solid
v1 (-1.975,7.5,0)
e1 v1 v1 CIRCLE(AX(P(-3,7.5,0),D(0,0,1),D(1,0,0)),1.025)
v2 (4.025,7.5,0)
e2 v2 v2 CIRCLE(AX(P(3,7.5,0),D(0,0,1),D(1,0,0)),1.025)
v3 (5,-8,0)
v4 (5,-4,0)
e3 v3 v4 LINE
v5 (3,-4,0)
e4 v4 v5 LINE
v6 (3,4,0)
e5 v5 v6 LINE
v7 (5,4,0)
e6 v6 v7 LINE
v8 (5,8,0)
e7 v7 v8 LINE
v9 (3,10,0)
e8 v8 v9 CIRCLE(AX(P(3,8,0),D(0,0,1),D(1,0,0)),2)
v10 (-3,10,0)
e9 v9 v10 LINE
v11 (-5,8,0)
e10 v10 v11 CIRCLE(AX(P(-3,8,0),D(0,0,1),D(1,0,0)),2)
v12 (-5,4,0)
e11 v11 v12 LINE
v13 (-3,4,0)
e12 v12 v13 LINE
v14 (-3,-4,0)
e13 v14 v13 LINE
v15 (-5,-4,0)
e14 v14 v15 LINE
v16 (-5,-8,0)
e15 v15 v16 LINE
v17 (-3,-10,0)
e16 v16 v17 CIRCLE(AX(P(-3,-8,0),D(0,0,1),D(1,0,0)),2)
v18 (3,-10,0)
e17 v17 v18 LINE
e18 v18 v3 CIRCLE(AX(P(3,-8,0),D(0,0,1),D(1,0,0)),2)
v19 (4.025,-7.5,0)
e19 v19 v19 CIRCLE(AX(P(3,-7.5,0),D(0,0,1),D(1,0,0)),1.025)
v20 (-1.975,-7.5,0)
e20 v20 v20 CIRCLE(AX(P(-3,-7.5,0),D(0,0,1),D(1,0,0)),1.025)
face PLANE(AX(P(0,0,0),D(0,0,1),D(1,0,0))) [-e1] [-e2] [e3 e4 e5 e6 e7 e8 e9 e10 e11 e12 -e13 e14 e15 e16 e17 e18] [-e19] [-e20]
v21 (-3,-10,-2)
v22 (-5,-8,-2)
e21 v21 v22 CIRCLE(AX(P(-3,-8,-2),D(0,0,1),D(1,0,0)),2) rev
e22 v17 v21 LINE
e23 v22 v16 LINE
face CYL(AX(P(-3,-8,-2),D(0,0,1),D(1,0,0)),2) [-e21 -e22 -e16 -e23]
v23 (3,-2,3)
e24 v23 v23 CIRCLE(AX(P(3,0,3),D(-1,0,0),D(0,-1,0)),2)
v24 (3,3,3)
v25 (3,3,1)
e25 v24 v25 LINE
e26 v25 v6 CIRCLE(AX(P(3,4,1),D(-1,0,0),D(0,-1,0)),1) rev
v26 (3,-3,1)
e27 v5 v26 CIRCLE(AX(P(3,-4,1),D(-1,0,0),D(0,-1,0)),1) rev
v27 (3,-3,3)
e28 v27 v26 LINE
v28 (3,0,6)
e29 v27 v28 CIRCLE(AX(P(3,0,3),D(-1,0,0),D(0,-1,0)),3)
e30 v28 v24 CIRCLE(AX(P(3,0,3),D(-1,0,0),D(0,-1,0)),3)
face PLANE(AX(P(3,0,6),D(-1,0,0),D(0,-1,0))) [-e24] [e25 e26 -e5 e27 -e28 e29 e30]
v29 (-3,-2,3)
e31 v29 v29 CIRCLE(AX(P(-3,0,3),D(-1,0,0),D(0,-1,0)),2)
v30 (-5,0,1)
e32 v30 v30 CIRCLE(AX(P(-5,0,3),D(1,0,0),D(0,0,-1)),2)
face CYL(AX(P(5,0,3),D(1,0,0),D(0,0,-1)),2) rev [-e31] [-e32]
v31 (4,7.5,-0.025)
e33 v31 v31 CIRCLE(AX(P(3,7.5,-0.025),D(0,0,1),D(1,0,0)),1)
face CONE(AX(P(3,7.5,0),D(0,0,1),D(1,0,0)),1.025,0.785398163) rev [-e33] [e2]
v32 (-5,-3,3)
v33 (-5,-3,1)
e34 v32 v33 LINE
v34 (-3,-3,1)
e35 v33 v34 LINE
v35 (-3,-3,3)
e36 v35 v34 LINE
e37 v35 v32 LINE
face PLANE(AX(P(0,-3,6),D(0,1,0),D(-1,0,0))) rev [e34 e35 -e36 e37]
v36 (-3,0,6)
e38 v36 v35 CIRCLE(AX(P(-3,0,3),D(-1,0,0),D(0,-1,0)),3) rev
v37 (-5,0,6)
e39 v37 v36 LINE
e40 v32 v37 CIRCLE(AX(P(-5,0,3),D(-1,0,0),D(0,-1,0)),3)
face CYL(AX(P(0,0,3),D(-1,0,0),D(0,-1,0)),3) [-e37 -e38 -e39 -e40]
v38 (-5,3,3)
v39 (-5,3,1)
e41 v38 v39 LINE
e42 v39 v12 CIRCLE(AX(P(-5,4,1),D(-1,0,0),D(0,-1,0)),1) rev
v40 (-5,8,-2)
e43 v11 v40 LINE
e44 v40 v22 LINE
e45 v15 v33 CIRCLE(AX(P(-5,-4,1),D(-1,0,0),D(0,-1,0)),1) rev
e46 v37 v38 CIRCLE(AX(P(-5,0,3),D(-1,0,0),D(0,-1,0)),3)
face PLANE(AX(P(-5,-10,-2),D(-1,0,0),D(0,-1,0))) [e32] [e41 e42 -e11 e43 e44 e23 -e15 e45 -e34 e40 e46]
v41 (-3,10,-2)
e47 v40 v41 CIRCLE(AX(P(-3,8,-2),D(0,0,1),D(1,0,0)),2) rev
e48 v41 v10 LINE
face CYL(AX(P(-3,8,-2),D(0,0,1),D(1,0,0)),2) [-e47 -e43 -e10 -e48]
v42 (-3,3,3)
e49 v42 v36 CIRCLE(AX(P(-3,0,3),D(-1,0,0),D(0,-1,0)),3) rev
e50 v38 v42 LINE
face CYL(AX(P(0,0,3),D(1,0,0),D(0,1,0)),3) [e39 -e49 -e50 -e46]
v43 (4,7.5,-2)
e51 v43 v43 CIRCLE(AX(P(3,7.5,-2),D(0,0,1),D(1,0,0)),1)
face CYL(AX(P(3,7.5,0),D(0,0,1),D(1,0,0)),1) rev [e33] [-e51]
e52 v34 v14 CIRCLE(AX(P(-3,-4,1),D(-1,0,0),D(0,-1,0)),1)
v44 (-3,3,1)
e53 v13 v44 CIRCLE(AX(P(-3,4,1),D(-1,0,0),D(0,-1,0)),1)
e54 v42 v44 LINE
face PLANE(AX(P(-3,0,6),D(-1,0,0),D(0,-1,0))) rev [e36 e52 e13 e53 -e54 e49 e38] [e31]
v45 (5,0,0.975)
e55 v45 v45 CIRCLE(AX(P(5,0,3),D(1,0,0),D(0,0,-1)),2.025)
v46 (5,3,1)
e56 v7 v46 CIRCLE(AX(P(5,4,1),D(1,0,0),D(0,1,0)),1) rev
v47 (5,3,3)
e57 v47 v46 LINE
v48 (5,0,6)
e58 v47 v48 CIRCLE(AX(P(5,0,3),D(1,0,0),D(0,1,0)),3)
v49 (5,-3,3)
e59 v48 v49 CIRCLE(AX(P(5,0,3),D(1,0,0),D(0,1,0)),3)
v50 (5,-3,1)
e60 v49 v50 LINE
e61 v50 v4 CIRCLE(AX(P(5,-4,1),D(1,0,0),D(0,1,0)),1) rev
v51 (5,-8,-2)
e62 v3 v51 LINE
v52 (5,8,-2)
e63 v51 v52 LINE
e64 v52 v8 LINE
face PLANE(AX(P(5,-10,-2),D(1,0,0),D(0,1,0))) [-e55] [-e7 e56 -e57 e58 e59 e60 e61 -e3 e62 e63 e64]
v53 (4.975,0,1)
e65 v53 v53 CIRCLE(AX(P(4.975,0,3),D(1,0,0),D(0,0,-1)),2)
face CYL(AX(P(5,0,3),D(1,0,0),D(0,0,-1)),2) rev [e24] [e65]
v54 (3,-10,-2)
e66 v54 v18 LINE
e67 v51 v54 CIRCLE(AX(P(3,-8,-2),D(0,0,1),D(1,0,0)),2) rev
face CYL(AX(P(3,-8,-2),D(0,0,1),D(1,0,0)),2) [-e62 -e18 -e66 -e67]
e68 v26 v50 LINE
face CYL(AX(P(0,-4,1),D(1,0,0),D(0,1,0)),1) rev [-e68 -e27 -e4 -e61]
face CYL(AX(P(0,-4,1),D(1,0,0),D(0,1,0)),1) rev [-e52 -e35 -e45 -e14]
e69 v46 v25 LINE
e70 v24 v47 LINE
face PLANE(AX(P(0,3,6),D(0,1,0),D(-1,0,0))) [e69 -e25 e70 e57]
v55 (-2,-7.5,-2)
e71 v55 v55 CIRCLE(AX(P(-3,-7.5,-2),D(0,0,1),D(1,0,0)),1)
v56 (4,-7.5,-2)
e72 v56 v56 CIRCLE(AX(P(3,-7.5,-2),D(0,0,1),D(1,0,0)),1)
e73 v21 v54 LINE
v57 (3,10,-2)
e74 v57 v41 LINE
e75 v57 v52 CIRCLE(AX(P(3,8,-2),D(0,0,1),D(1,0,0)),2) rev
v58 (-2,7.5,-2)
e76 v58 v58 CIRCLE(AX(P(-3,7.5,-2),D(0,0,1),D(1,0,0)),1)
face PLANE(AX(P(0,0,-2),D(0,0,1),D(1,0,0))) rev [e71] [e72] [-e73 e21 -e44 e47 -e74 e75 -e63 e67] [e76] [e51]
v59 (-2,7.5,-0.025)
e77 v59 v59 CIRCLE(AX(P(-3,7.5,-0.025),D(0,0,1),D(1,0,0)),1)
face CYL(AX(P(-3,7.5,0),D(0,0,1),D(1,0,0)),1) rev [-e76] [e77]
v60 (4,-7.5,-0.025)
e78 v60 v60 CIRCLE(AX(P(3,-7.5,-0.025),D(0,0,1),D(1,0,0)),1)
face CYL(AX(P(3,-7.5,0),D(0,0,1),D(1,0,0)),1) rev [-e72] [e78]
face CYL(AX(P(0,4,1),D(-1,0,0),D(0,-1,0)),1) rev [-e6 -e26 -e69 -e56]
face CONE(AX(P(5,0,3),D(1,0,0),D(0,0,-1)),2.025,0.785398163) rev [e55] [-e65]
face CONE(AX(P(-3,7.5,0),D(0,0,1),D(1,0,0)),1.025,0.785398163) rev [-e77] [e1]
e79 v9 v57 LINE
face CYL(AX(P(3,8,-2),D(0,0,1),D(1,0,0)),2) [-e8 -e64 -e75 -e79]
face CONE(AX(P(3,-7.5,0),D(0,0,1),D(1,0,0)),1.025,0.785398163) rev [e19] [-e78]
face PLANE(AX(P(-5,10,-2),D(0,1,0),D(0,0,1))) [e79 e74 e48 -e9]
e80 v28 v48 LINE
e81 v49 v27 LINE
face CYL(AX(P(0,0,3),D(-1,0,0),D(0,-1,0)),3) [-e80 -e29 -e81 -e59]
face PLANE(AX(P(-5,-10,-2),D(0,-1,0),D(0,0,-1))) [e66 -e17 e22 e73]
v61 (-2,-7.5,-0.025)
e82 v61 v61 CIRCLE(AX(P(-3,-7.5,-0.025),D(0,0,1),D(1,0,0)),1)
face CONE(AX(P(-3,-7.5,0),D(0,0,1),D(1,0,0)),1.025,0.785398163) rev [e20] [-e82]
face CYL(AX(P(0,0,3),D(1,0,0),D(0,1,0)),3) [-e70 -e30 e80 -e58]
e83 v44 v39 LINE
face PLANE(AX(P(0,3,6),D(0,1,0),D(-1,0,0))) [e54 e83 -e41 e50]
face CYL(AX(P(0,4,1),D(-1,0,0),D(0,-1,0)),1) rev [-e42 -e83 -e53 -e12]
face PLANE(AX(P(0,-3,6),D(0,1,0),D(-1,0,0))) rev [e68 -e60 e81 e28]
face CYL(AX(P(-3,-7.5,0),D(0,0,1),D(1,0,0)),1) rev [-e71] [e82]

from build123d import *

# Parameters (mm, degrees)
SKETCH1_W                       = 20
SKETCH1_H                       = 10
BOSS_EXTRUDE1_DEPTH             = 2
SKETCH2_W                       = 6
SKETCH2_H                       = 2
BOSS_EXTRUDE2_DEPTH             = 6
FILLET1_R                       = 3
F_4_0MM_DOWEL_HOLE1_D           = 4
F_4_0MM_DOWEL_HOLE1_CSINK_D     = 4.05
F_4_0MM_DOWEL_HOLE1_CSINK_ANGLE = 90
F_2_0MM_DOWEL_HOLE1_D           = 2
F_2_0MM_DOWEL_HOLE1_CSINK_D     = 2.05
F_2_0MM_DOWEL_HOLE1_CSINK_ANGLE = 90
FILLET2_R                       = 1
FILLET3_R                       = 2


with BuildPart() as part:
    # Sketch1 → Boss-Extrude1 (new body)
    with BuildSketch(Plane(origin=(0, 0, 0), x_dir=(0, 1, 0), z_dir=(0, 0, 1))):
        Rectangle(SKETCH1_W, SKETCH1_H)
    extrude(amount=-BOSS_EXTRUDE1_DEPTH)

    # Sketch2 → Boss-Extrude2 (add)
    with BuildSketch(Plane(origin=(0, 0, 0), x_dir=(0, 1, 0), z_dir=(0, 0, 1))):
        with Locations((0, 4)):
            Rectangle(SKETCH2_W, SKETCH2_H)
        with Locations((0, -4)):
            Rectangle(SKETCH2_W, SKETCH2_H)
    extrude(amount=BOSS_EXTRUDE2_DEPTH)

    # Fillet1
    fillet1_edges = [part.edges().sort_by_distance(p)[0] for p in [
        (4, 3, 6),
        (4, -3, 6),
        (-4, 3, 6),
        (-4, -3, 6),
    ]]
    fillet(fillet1_edges, radius=FILLET1_R - 0.0001)  # a hair under: the kernel refuses the full size

    # Ø4.0mm Dowel Hole1 (through all)
    with Locations(Plane.YZ.offset(5)):
        with Locations((0, 3)):
            CounterSinkHole(F_4_0MM_DOWEL_HOLE1_D / 2, F_4_0MM_DOWEL_HOLE1_CSINK_D / 2, counter_sink_angle=F_4_0MM_DOWEL_HOLE1_CSINK_ANGLE)

    # Ø2.0mm Dowel Hole1 (through all)
    with Locations(Plane(origin=(0, 0, 0), x_dir=(0, 1, 0), z_dir=(0, 0, 1))):
        with Locations((7.5, -3), (-7.5, 3), (-7.5, -3), (7.5, 3)):
            CounterSinkHole(F_2_0MM_DOWEL_HOLE1_D / 2, F_2_0MM_DOWEL_HOLE1_CSINK_D / 2, counter_sink_angle=F_2_0MM_DOWEL_HOLE1_CSINK_ANGLE)

    # Fillet2
    fillet2_edges = [part.edges().sort_by_distance(p)[0] for p in [
        (-4, -3, 0),
        (-4, 3, 0),
        (4, -3, 0),
        (4, 3, 0),
    ]]
    fillet(fillet2_edges, radius=FILLET2_R)

    # Fillet3
    fillet3_edges = [part.edges().sort_by_distance(p)[0] for p in [
        (-5, -10, -1),
        (-5, 10, -1),
        (5, 10, -1),
        (5, -10, -1),
    ]]
    fillet(fillet3_edges, radius=FILLET3_R)


solid = part.part
